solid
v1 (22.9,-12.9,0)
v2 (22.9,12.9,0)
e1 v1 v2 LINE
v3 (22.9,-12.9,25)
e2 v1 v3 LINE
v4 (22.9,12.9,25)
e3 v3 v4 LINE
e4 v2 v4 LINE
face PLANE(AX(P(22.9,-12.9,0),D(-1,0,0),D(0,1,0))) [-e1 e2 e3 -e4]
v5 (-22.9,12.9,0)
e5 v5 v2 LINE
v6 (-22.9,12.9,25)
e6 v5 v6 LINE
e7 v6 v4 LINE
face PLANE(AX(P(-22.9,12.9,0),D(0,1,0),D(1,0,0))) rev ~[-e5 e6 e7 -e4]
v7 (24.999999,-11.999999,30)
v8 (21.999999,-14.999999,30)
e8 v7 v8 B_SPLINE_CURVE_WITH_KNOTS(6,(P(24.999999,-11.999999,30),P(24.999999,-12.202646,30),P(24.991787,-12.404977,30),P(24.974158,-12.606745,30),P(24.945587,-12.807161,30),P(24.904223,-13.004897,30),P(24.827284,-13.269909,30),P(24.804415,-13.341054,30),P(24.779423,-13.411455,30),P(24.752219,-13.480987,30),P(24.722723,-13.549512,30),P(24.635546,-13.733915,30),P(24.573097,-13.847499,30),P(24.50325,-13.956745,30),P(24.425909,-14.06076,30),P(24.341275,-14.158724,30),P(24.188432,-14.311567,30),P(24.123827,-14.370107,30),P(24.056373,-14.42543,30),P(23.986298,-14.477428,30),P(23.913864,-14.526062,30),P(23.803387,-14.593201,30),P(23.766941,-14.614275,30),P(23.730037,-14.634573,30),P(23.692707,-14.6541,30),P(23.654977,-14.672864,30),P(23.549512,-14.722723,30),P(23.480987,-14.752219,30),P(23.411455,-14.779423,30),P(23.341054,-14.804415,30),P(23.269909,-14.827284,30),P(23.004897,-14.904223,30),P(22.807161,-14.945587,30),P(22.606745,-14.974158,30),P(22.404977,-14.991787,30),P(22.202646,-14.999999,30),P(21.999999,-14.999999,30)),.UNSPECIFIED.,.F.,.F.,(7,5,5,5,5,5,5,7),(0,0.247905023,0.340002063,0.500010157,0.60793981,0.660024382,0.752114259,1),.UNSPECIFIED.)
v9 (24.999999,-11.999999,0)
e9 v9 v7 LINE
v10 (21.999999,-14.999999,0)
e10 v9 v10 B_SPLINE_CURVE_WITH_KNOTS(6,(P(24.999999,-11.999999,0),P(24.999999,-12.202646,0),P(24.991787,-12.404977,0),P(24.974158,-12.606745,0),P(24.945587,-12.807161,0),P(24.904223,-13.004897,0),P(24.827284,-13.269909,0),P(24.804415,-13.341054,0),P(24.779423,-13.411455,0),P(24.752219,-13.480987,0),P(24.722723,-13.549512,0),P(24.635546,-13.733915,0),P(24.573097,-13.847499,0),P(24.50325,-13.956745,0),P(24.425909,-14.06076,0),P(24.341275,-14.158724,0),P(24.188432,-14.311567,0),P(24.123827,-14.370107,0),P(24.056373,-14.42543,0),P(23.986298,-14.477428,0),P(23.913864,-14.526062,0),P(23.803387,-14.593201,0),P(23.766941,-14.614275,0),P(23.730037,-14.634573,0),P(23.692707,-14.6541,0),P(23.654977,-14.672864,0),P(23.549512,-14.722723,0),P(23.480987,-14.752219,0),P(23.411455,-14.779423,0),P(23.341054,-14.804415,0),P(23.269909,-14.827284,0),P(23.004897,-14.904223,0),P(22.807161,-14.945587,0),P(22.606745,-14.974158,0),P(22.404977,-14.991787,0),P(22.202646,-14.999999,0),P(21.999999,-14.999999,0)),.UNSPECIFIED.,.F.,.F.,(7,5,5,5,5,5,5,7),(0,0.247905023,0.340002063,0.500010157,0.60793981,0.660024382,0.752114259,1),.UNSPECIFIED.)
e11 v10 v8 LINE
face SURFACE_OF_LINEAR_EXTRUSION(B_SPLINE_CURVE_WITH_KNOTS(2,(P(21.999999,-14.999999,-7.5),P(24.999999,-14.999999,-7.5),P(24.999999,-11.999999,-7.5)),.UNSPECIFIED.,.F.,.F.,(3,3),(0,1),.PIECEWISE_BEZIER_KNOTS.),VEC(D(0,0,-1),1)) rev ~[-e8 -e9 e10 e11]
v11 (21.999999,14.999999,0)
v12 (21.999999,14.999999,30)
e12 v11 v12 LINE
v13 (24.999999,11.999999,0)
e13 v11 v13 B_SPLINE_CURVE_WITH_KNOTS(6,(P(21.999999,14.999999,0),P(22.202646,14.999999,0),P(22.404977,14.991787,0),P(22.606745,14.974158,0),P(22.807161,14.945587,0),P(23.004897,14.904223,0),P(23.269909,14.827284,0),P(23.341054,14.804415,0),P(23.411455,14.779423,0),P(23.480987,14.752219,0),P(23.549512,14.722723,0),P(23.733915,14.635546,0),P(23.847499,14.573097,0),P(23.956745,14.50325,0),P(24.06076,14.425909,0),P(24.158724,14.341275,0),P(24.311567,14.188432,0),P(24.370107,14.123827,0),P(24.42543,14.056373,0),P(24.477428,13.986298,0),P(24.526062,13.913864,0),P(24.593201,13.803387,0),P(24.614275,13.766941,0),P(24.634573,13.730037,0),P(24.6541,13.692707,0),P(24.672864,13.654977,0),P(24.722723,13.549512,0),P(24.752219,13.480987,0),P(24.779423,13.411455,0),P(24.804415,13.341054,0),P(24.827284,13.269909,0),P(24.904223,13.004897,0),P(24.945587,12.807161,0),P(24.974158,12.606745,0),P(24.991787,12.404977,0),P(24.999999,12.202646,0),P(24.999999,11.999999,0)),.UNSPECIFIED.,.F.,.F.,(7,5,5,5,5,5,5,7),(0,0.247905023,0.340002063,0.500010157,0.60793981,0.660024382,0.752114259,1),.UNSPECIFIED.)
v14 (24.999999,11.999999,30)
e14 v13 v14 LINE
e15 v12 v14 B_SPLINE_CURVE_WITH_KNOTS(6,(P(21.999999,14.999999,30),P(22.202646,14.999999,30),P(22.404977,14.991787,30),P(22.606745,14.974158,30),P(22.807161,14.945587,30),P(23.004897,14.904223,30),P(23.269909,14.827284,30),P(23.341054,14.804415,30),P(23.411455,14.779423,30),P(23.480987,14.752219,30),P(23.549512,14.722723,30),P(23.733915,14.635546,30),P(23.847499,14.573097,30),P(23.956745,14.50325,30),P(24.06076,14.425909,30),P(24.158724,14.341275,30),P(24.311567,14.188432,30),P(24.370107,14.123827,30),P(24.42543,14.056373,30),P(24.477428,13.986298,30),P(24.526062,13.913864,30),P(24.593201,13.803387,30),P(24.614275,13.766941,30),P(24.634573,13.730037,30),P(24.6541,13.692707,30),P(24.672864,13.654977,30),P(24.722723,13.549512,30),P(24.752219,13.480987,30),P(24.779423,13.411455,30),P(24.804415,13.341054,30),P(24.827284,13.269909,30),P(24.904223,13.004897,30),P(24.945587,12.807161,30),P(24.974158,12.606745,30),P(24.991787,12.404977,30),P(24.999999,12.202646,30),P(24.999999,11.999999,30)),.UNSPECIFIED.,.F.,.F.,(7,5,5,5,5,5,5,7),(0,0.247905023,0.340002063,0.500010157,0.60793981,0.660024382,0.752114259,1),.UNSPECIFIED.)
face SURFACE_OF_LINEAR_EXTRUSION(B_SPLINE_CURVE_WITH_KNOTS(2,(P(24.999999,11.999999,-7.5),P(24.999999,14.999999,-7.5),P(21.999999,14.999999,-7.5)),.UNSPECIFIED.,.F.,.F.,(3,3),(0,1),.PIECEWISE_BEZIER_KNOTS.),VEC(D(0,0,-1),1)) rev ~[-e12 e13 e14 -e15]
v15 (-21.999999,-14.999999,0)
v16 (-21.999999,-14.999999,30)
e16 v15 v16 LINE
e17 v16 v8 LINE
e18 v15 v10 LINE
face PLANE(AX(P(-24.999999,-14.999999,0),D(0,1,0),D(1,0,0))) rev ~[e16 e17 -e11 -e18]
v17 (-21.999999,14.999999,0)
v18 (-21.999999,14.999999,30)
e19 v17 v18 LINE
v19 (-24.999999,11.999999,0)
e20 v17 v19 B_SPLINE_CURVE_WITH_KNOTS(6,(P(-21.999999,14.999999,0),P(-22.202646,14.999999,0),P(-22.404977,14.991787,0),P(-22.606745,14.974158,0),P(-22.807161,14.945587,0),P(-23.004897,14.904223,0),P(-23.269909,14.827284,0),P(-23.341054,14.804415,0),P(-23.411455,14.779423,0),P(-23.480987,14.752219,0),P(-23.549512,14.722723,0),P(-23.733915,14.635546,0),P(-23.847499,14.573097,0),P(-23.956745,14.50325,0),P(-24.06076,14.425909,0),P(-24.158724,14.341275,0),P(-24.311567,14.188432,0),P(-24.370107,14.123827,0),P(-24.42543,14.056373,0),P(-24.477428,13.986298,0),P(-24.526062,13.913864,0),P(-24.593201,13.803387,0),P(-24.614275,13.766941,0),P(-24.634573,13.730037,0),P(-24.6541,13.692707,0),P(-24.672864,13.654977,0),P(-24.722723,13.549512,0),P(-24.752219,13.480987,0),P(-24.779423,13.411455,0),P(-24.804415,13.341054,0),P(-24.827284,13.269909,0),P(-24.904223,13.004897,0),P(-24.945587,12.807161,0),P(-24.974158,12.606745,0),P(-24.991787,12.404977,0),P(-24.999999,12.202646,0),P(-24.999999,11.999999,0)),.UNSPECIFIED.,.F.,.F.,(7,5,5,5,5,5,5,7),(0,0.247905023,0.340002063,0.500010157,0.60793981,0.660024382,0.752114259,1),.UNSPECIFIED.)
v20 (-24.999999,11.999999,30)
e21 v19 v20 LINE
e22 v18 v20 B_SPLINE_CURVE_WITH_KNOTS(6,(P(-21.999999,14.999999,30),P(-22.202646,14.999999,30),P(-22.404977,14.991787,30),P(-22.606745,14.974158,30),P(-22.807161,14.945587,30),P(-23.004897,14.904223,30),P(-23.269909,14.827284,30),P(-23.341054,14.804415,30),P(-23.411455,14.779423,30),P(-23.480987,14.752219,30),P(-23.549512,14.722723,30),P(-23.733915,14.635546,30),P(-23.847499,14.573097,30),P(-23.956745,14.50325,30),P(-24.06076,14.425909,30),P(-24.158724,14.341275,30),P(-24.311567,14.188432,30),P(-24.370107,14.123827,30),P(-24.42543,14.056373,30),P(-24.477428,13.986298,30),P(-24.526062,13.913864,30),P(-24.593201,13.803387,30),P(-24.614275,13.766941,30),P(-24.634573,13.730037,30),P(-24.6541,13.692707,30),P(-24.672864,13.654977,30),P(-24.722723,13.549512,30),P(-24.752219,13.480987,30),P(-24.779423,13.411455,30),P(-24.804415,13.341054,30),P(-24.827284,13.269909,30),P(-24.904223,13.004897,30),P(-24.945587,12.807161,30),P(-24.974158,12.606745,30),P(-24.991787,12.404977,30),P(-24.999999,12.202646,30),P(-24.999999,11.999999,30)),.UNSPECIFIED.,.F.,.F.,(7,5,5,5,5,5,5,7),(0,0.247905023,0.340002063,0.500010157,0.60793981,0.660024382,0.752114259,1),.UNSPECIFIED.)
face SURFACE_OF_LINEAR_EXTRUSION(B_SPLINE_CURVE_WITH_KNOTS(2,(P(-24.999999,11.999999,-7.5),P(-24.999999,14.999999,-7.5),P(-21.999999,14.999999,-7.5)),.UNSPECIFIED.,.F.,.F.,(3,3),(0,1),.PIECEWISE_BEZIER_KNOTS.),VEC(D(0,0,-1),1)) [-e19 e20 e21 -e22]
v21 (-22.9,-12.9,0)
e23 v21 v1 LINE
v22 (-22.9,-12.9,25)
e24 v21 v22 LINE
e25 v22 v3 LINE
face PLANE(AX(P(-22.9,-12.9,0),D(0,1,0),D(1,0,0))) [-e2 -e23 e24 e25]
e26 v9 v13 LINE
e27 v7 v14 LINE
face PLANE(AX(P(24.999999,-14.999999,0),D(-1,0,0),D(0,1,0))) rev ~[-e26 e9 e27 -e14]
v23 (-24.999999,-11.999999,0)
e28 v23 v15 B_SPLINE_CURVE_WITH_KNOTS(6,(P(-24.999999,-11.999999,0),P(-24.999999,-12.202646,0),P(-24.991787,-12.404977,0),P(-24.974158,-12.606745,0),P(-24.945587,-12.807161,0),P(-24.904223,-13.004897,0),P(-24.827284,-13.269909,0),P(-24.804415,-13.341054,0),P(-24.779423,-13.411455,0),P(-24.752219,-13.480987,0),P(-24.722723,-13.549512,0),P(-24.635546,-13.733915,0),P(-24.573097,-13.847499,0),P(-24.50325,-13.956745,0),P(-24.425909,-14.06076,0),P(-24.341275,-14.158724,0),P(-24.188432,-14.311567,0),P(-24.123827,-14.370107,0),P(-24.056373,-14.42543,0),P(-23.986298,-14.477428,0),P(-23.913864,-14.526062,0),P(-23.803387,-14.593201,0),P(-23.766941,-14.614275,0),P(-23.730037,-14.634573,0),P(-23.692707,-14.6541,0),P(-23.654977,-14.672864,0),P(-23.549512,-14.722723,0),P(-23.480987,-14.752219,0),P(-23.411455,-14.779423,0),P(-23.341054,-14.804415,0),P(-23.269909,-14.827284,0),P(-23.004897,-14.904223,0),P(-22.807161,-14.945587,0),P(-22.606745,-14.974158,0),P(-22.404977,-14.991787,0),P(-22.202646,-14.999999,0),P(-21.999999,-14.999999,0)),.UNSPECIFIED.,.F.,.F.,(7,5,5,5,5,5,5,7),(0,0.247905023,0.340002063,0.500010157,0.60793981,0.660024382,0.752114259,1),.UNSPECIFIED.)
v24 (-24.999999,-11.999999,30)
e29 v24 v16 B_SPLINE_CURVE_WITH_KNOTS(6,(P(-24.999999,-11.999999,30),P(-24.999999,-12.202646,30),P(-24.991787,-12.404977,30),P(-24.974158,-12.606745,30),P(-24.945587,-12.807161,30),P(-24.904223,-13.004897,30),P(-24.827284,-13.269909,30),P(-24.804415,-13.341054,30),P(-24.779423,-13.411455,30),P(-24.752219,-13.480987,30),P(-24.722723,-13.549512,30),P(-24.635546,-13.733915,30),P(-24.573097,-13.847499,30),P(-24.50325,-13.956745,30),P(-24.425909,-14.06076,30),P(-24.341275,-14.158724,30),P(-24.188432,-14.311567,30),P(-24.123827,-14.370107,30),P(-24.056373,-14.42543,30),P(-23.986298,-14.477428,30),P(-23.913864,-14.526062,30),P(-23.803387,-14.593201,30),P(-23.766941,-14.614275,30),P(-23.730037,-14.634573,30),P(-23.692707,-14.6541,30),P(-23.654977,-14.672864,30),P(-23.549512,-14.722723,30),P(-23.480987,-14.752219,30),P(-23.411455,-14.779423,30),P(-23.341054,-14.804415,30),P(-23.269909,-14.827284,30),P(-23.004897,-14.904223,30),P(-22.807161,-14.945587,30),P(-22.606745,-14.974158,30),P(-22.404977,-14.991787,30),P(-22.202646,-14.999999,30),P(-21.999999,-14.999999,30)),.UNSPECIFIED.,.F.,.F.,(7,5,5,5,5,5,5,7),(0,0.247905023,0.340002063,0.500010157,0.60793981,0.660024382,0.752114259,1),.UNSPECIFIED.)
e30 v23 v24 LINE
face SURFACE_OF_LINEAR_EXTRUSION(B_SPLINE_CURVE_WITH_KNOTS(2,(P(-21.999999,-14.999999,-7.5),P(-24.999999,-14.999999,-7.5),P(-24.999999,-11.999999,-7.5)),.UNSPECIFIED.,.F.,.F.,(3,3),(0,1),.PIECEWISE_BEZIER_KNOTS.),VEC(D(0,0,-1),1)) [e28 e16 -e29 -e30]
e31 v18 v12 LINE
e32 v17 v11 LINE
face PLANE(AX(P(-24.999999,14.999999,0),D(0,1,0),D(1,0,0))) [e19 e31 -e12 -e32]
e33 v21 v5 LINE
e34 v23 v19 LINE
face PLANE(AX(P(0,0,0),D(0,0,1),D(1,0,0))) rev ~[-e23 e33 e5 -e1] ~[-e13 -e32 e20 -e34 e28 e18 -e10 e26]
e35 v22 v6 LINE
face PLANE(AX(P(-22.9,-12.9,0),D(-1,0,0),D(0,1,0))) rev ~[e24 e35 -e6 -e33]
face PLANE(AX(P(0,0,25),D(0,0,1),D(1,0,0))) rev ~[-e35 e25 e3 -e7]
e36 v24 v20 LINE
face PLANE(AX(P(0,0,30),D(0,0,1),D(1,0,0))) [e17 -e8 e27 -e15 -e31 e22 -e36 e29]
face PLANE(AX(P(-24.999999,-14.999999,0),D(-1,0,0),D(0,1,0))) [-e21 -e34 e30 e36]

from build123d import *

# Parameters (mm, degrees)
F0_W        = 49.9999988824
F0_H        = 29.9999988824
F0_W_2      = 45.8000008941
F0_H_2      = 25.8000008941
F0_W_3      = 45.0000008941
F0_H_3      = 25.0000008941
F0_W_4      = 40
F0_H_4      = 20
F1_DEPTH    = 30
F2_DEPTH    = 25
F3_T1_DEPTH = 45


# Not quite as in the source:
# - a fillet or chamfer that OpenCascade refuses, or shapes differently, is made with other operations: its cross-section is extruded or revolved along the edge and cut away or added


with BuildPart() as f1:
    # F0 (on Top) → F1 (new body)
    with BuildSketch(Plane.XY):
        Rectangle(F0_W, F0_H)
        Rectangle(F0_W_2, F0_H_2, mode=Mode.SUBTRACT)
        Rectangle(F0_W_2, F0_H_2)
        Rectangle(F0_W_3, F0_H_3, mode=Mode.SUBTRACT)
        Rectangle(F0_W_3, F0_H_3)
        Rectangle(F0_W_4, F0_H_4, mode=Mode.SUBTRACT)
        Rectangle(F0_W_4, F0_H_4)
    extrude(amount=F1_DEPTH)

    # F0 (on Top) → F2 (cut)
    with BuildSketch(Plane.XY):
        Rectangle(F0_W_2, F0_H_2)
        Rectangle(F0_W_3, F0_H_3, mode=Mode.SUBTRACT)
        Rectangle(F0_W_3, F0_H_3)
        Rectangle(F0_W_4, F0_H_4, mode=Mode.SUBTRACT)
        Rectangle(F0_W_4, F0_H_4)
    extrude(amount=F2_DEPTH, mode=Mode.SUBTRACT)

    # F3: fillet of radius 3 on 4 edges, made by hand

    # F3_s2 → F3_t1 (cut)
    with BuildSketch(Plane.XY.offset(-7.5)):
        with BuildLine():
            add(Edge.make_bspline(
                [(-21.9999994412, -14.9999994412), (-24.9999994412, -14.9999994412), (-24.9999994412, -11.9999994412)],
                knots=[0, 0, 0, 1, 1, 1], degree=2, weights=[1, 1, 1]))
            Line((-24.9999994412, -11.9999994412), (-24.9999994412, -14.9999994412))
            Line((-24.9999994412, -14.9999994412), (-21.9999994412, -14.9999994412))
        make_face()
        with BuildLine():
            add(Edge.make_bspline(
                [(-24.9999994412, 11.9999994412), (-24.9999994412, 14.9999994412), (-21.9999994412, 14.9999994412)],
                knots=[0, 0, 0, 1, 1, 1], degree=2, weights=[1, 1, 1]))
            Line((-21.9999994412, 14.9999994412), (-24.9999994412, 14.9999994412))
            Line((-24.9999994412, 14.9999994412), (-24.9999994412, 11.9999994412))
        make_face()
        with BuildLine():
            add(Edge.make_bspline(
                [(21.9999994412, -14.9999994412), (24.9999994412, -14.9999994412), (24.9999994412, -11.9999994412)],
                knots=[0, 0, 0, 1, 1, 1], degree=2, weights=[1, 1, 1]))
            Line((24.9999994412, -11.9999994412), (24.9999994412, -14.9999994412))
            Line((24.9999994412, -14.9999994412), (21.9999994412, -14.9999994412))
        make_face()
        with BuildLine():
            add(Edge.make_bspline(
                [(24.9999994412, 11.9999994412), (24.9999994412, 14.9999994412), (21.9999994412, 14.9999994412)],
                knots=[0, 0, 0, 1, 1, 1], degree=2, weights=[1, 1, 1]))
            Line((21.9999994412, 14.9999994412), (24.9999994412, 14.9999994412))
            Line((24.9999994412, 14.9999994412), (24.9999994412, 11.9999994412))
        make_face()
    extrude(amount=F3_T1_DEPTH, mode=Mode.SUBTRACT)


solid = f1.part
